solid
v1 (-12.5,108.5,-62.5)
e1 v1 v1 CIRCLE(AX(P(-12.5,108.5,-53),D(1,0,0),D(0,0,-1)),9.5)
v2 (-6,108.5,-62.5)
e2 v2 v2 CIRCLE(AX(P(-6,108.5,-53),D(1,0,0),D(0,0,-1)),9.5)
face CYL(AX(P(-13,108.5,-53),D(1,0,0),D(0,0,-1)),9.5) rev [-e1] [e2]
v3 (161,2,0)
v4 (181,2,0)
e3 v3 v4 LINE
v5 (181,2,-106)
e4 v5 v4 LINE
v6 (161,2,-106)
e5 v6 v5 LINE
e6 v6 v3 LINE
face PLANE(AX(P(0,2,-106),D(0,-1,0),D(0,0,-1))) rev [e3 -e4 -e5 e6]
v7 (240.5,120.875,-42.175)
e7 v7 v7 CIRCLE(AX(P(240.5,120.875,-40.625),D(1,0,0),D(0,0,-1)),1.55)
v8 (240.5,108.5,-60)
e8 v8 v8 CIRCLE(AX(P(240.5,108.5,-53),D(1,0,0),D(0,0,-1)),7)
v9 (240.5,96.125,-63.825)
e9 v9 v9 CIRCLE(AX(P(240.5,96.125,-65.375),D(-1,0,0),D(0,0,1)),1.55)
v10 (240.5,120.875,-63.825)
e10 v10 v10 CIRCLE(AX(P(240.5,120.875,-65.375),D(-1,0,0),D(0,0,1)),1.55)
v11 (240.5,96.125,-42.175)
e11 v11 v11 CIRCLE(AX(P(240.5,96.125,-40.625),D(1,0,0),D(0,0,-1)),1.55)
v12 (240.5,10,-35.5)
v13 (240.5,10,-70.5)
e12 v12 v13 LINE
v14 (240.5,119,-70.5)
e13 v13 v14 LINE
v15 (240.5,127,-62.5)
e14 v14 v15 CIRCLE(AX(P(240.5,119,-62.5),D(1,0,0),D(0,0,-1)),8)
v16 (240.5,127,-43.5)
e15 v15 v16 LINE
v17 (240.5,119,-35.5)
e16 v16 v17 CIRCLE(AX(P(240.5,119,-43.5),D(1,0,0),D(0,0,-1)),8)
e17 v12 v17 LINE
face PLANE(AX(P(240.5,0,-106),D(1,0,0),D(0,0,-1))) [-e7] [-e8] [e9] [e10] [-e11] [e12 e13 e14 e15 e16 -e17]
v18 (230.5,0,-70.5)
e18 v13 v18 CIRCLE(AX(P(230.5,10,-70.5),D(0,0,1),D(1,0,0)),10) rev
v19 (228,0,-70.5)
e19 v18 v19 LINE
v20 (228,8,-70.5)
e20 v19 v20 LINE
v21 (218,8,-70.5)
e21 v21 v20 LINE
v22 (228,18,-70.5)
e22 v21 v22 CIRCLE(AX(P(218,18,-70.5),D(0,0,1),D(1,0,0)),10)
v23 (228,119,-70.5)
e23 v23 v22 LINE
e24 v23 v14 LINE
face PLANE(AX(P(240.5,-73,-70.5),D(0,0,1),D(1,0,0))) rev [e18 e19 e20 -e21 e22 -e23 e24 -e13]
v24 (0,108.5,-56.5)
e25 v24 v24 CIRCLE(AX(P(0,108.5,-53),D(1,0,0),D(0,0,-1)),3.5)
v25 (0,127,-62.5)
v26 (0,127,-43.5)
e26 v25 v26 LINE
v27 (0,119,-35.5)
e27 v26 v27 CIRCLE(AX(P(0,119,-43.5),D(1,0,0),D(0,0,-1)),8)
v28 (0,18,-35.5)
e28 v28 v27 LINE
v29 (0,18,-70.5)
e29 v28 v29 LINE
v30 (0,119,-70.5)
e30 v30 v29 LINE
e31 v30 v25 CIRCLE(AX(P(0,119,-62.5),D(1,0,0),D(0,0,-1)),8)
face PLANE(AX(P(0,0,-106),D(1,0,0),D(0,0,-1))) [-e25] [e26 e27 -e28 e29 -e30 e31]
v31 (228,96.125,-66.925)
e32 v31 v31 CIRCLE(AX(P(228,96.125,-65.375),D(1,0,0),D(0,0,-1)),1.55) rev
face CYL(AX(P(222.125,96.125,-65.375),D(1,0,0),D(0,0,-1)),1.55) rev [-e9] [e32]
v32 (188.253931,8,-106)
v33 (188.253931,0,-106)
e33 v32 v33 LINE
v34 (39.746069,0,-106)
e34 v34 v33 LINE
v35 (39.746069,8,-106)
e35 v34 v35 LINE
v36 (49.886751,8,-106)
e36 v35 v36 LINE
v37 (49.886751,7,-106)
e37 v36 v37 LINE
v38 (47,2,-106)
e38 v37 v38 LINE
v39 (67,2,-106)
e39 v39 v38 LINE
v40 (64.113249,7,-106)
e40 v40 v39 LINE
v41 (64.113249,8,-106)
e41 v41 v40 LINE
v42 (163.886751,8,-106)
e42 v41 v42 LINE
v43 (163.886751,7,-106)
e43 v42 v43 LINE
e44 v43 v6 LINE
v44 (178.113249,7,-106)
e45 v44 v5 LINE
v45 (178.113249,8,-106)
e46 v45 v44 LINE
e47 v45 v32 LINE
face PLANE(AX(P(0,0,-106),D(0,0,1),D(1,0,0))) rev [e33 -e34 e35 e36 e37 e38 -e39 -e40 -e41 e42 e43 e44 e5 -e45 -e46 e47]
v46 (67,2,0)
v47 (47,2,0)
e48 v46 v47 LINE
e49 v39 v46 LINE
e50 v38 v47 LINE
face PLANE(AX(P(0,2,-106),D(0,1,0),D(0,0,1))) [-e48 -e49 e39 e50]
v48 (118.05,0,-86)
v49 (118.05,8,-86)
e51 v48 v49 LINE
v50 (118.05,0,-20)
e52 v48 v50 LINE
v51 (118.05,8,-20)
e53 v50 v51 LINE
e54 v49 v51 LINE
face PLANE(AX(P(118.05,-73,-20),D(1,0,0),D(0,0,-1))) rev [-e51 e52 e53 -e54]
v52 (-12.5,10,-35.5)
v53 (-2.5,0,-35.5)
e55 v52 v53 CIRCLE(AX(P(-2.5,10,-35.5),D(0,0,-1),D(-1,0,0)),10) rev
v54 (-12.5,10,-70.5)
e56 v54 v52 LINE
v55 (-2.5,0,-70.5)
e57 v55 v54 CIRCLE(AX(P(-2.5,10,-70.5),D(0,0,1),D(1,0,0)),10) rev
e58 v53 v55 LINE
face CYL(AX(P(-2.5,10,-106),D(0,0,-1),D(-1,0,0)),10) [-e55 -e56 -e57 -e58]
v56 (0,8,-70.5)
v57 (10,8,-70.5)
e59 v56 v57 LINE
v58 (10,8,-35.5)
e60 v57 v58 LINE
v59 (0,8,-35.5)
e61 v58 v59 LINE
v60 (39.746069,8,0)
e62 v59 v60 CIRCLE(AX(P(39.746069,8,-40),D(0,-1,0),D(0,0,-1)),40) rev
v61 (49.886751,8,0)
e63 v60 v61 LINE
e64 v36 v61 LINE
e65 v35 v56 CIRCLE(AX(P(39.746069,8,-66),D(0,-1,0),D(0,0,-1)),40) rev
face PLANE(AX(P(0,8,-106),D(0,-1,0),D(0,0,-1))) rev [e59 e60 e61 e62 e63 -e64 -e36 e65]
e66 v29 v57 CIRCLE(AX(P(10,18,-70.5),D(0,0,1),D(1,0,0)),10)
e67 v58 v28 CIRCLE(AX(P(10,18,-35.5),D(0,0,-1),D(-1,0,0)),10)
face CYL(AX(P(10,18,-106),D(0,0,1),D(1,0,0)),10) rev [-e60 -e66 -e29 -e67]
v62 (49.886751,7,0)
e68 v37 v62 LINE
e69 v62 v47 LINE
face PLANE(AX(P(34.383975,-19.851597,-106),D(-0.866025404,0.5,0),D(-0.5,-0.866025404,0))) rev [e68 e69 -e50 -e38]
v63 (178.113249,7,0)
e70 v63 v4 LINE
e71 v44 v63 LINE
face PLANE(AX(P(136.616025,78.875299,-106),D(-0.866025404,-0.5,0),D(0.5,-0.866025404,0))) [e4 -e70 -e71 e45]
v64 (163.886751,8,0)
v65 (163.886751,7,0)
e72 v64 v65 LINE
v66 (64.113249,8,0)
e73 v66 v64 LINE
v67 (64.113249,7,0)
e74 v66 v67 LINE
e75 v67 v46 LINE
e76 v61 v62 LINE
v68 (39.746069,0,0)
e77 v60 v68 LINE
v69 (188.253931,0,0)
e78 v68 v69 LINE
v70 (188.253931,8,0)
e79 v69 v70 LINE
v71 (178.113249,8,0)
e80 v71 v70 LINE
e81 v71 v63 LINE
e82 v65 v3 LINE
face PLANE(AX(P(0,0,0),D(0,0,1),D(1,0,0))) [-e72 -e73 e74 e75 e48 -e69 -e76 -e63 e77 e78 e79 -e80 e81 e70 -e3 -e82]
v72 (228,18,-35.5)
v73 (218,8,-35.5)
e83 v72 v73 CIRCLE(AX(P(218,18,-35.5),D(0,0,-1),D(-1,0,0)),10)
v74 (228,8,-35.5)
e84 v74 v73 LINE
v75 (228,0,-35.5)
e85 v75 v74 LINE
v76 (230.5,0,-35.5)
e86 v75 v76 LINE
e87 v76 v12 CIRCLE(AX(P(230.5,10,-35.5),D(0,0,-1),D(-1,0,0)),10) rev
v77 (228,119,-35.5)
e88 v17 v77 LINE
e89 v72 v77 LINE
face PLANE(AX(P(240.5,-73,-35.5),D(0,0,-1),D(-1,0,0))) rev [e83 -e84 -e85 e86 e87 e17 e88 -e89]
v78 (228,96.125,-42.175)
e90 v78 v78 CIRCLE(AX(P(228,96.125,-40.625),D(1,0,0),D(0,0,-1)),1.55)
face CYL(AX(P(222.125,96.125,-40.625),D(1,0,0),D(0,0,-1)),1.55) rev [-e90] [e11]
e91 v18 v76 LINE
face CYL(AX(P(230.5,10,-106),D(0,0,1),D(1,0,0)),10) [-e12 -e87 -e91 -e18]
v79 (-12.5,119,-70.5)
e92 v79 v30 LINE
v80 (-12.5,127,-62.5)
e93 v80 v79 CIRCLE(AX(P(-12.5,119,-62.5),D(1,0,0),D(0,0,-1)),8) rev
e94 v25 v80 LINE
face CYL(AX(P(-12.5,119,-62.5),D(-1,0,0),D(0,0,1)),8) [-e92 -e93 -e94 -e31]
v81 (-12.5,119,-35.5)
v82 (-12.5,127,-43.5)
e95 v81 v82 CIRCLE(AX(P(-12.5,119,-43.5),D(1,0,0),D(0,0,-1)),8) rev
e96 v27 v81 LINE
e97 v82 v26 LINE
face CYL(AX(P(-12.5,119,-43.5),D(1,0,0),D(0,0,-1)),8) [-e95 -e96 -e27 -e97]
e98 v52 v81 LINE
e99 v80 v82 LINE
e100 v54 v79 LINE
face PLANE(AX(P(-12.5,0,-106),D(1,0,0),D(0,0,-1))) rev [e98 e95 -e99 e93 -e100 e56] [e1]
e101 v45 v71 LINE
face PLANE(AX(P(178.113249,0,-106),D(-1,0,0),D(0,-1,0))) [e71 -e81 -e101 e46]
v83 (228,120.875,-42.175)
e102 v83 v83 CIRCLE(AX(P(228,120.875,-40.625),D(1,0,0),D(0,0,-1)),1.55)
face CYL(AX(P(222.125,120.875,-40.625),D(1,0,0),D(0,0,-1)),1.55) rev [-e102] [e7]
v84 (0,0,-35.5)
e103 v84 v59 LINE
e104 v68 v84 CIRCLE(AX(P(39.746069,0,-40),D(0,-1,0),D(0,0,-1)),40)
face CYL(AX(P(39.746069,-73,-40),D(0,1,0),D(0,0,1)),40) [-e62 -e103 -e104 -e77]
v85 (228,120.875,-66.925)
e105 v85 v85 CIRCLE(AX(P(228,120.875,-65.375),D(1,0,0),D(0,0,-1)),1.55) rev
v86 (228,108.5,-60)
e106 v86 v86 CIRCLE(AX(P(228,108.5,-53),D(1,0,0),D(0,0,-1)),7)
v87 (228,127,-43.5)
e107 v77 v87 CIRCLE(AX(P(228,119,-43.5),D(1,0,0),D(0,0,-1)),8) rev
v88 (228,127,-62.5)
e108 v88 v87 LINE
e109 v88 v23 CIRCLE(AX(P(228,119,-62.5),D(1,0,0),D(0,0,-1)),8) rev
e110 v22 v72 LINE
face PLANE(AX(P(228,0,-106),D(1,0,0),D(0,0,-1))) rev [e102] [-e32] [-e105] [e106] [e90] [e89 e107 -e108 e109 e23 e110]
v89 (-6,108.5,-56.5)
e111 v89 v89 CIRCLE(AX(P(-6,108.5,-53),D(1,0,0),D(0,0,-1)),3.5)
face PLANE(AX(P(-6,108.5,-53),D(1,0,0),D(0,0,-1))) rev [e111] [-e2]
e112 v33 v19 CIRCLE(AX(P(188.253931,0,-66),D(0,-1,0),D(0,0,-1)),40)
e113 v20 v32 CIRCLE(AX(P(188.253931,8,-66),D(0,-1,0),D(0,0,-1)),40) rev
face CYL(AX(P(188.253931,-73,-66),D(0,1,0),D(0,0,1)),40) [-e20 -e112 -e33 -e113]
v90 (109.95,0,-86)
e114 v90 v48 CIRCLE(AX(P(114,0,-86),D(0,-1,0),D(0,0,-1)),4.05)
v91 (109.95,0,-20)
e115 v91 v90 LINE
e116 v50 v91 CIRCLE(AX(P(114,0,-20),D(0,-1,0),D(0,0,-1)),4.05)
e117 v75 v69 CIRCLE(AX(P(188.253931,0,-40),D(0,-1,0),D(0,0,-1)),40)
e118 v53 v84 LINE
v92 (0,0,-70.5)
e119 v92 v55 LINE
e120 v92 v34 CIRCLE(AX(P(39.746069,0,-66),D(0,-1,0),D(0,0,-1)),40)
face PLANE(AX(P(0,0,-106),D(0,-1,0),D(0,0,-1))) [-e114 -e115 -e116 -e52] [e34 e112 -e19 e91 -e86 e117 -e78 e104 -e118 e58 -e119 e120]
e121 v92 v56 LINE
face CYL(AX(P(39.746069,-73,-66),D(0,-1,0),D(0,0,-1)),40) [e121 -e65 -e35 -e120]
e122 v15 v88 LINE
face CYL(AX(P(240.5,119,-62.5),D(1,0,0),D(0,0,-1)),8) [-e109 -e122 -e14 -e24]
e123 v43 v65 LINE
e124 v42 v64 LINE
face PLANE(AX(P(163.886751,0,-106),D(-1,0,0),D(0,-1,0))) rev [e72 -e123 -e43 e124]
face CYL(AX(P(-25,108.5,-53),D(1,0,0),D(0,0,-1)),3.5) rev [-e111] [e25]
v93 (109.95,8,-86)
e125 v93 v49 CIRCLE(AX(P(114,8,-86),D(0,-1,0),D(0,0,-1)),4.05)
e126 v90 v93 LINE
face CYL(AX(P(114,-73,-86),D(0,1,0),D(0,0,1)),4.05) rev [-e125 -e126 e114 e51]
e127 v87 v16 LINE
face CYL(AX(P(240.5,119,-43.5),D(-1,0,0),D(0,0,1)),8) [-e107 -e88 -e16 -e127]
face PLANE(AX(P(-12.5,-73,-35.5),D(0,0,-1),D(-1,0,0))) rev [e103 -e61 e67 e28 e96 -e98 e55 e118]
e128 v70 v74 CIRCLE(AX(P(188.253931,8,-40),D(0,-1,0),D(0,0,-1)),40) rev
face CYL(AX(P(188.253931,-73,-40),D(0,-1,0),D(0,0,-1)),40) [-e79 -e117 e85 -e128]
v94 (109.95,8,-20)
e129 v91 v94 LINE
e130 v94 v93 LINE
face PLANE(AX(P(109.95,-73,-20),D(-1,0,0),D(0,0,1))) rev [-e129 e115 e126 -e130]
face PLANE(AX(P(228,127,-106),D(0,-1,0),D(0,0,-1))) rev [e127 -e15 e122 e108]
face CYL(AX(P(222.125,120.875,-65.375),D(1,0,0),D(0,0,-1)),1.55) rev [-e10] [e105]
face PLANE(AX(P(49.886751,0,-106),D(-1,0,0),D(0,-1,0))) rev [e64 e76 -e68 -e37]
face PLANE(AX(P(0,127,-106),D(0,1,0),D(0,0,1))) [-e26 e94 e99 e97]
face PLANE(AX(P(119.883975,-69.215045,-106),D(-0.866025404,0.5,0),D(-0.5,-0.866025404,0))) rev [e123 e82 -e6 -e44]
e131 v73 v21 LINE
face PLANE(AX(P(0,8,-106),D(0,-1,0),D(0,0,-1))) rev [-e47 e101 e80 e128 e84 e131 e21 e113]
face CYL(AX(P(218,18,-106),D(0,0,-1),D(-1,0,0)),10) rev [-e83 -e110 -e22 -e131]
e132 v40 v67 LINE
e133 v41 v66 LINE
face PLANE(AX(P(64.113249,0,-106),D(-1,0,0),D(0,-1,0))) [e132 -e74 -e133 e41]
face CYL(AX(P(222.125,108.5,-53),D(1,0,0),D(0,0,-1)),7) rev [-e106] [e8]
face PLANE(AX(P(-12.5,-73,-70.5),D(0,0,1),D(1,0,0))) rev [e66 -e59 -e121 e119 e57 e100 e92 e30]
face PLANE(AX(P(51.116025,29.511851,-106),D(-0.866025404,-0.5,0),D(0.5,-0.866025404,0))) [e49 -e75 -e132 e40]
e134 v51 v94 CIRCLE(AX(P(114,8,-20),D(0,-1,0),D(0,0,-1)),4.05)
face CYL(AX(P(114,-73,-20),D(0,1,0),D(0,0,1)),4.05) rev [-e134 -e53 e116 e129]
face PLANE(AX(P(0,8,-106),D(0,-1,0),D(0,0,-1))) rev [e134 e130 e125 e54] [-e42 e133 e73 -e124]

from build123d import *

# Parameters (mm, degrees)
SKETCH1_W           = 12.5
SKETCH1_H           = 127
BOSS_EXTRUDE1_DEPTH = 106
SKETCH2_W           = 12.5
SKETCH2_H           = 35.5
CUT_EXTRUDE1_DEPTH  = 200
SKETCH4_4_R         = 6
CUT_EXTRUDE3_DEPTH  = 37
SKETCH4_R           = 7
SKETCH4_R_2         = 1.55
CUT_EXTRUDE4_DEPTH  = 18.375
FILLET3_R           = 8
FILLET4_R           = 10
FILLET5_R           = 40
SKETCH5_R           = 3.5
CUT_EXTRUDE5_DEPTH  = 25
CUT_EXTRUDE6_START  = -6
SKETCH5_3_R         = 9.5
SKETCH5_3_R_2       = 3.5
CUT_EXTRUDE6_DEPTH  = 7


with BuildPart() as part:
    # Sketch1 → Boss-Extrude1 (new body)
    with BuildSketch(Plane.XY):
        Polygon((0, 8), (0, 0), (228, 0), (228, 8), (178.113248654, 8), (178.113248654, 7), (181, 2), (161, 2), (163.886751346, 7), (163.886751346, 8), (64.113248654, 8), (64.113248654, 7), (67, 2), (47, 2), (49.886751346, 7), (49.886751346, 8), align=None)
        with Locations((234.25, 63.5)):
            Rectangle(SKETCH1_W, SKETCH1_H)
        with Locations((-6.25, 63.5)):
            Rectangle(SKETCH1_W, SKETCH1_H)
    extrude(amount=-BOSS_EXTRUDE1_DEPTH)

    # Sketch2 → Cut-Extrude1 (cut)
    with BuildSketch(Plane(origin=(0, 127, 0), x_dir=(1, 0, 0), z_dir=(0, 1, 0))):
        with Locations((-6.25, 88.25)):
            Rectangle(SKETCH2_W, SKETCH2_H)
        with Locations((-6.25, 17.75)):
            Rectangle(SKETCH2_W, SKETCH2_H)
        with Locations((234.25, 88.25)):
            Rectangle(SKETCH2_W, SKETCH2_H)
        with Locations((234.25, 17.75)):
            Rectangle(SKETCH2_W, SKETCH2_H)
        with BuildLine():
            Line((109.95, 20), (109.95, 86))
            ThreePointArc((109.95, 86), (114, 90.05), (118.05, 86))
            Line((118.05, 86), (118.05, 20))
            ThreePointArc((118.05, 20), (114, 15.95), (109.95, 20))
        make_face()
    extrude(amount=-CUT_EXTRUDE1_DEPTH, mode=Mode.SUBTRACT)

    # Sketch4<4> → Cut-Extrude3 (cut)
    with BuildSketch(Plane(origin=(240.5, 0, 0), x_dir=(0, 0, -1), z_dir=(1, 0, 0))):
        with Locations((53, 108.5)):
            Circle(SKETCH4_4_R)
    extrude(amount=-CUT_EXTRUDE3_DEPTH, mode=Mode.SUBTRACT)

    # Sketch4 → Cut-Extrude4 (cut)
    with BuildSketch(Plane(origin=(240.5, 0, 0), x_dir=(0, 0, -1), z_dir=(1, 0, 0))):
        with Locations((53, 108.5)):
            Circle(SKETCH4_R)
        with Locations((40.625, 120.875)):
            Circle(SKETCH4_R_2)
        with Locations((40.625, 96.125)):
            Circle(SKETCH4_R_2)
        with Locations((65.375, 96.125)):
            Circle(SKETCH4_R_2)
        with Locations((65.375, 120.875)):
            Circle(SKETCH4_R_2)
    extrude(amount=-CUT_EXTRUDE4_DEPTH, mode=Mode.SUBTRACT)

    # Fillet3
    fillet3_edges = [part.edges().sort_by_distance(p)[0] for p in [
        (-6.25, 127, -35.5),
        (234.25, 127, -70.5),
        (234.25, 127, -35.5),
        (-6.25, 127, -70.5),
    ]]
    fillet(fillet3_edges, radius=FILLET3_R)

    # Fillet4
    fillet4_edges = [part.edges().sort_by_distance(p)[0] for p in [
        (228, 8, -53),
        (240.5, 0, -53),
        (0, 8, -53),
        (-12.5, 0, -53),
    ]]
    fillet(fillet4_edges, radius=FILLET4_R)

    # Fillet5
    # the kernel refuses this fillet: 40 mm, written as the material it takes off along each edge
    with BuildSketch(Plane(origin=(228, 107.36517247, -106), x_dir=(-1, 0, 0), z_dir=(0, -1, 0))) as fillet5_piece_1:
        with BuildLine():
            CenterArc((39.746068988, -40), FILLET5_R, 90, 83.540550223)
            Line((0, -35.5), (-0.79492138, -35.41))
            ThreePointArc((-0.79492138, -35.41), (-0.8, -17.75), (-0.8, 0))
            Line((-0.8, 0), (0, 0.8))
            Line((0, 0.8), (39.746068988, 0.8))
            Line((39.746068988, 0.8), (39.746068988, 0))
        make_face()
    extrude(amount=206.73034494, mode=Mode.SUBTRACT)
    with BuildSketch(Plane(origin=(0, 107.36517247, -106), x_dir=(0, 0, 1), z_dir=(0, -1, 0))) as fillet5_piece_2:
        with BuildLine():
            CenterArc((40, -39.746068988), FILLET5_R, 96.459449777, 83.540550223)
            Line((0, -39.746068988), (-0.8, -39.746068988))
            Line((-0.8, -39.746068988), (-0.8, 0))
            Line((-0.8, 0), (0, 0.8))
            ThreePointArc((0, 0.8), (17.75, 0.8), (35.41, 0.79492138))
            Line((35.41, 0.79492138), (35.5, 0))
        make_face()
    extrude(amount=206.73034494, mode=Mode.SUBTRACT)
    with BuildSketch(Plane(origin=(0, 107.36517247, 0), x_dir=(0, 0, -1), z_dir=(0, -1, 0))) as fillet5_piece_3:
        with BuildLine():
            CenterArc((40, 39.746068988), FILLET5_R, 180, 83.540550223)
            Line((0, 39.746068988), (-0.8, 39.746068988))
            Line((-0.8, 39.746068988), (-0.8, 0))
            Line((-0.8, 0), (0, -0.8))
            ThreePointArc((0, -0.8), (17.75, -0.8), (35.41, -0.79492138))
            Line((35.41, -0.79492138), (35.5, 0))
        make_face()
    extrude(amount=206.73034494, mode=Mode.SUBTRACT)
    with BuildSketch(Plane(origin=(228, 107.36517247, 0), x_dir=(-1, 0, 0), z_dir=(0, -1, 0))) as fillet5_piece_4:
        with BuildLine():
            CenterArc((39.746068988, 40), FILLET5_R, 186.459449777, 83.540550223)
            Line((0, 35.5), (-0.79492138, 35.41))
            ThreePointArc((-0.79492138, 35.41), (-0.8, 17.75), (-0.8, 0))
            Line((-0.8, 0), (0, -0.8))
            Line((0, -0.8), (39.746068988, -0.8))
            Line((39.746068988, -0.8), (39.746068988, 0))
        make_face()
    extrude(amount=206.73034494, mode=Mode.SUBTRACT)

    # Sketch5 → Cut-Extrude5 (cut)
    with BuildSketch(Plane(origin=(0, 0, 0), x_dir=(0, 0, -1), z_dir=(1, 0, 0))):
        with Locations((53, 108.5)):
            Circle(SKETCH5_R)
    extrude(amount=-CUT_EXTRUDE5_DEPTH, mode=Mode.SUBTRACT)

    # Sketch5<3> → Cut-Extrude6 (cut)
    with BuildSketch(Plane(origin=(0, 0, 0), x_dir=(0, 0, -1), z_dir=(1, 0, 0)).offset(CUT_EXTRUDE6_START)):
        with Locations((53, 108.5)):
            Circle(SKETCH5_3_R)
        with Locations((53, 108.5)):
            Circle(SKETCH5_3_R_2, mode=Mode.SUBTRACT)
    extrude(amount=-CUT_EXTRUDE6_DEPTH, mode=Mode.SUBTRACT)


solid = part.part
